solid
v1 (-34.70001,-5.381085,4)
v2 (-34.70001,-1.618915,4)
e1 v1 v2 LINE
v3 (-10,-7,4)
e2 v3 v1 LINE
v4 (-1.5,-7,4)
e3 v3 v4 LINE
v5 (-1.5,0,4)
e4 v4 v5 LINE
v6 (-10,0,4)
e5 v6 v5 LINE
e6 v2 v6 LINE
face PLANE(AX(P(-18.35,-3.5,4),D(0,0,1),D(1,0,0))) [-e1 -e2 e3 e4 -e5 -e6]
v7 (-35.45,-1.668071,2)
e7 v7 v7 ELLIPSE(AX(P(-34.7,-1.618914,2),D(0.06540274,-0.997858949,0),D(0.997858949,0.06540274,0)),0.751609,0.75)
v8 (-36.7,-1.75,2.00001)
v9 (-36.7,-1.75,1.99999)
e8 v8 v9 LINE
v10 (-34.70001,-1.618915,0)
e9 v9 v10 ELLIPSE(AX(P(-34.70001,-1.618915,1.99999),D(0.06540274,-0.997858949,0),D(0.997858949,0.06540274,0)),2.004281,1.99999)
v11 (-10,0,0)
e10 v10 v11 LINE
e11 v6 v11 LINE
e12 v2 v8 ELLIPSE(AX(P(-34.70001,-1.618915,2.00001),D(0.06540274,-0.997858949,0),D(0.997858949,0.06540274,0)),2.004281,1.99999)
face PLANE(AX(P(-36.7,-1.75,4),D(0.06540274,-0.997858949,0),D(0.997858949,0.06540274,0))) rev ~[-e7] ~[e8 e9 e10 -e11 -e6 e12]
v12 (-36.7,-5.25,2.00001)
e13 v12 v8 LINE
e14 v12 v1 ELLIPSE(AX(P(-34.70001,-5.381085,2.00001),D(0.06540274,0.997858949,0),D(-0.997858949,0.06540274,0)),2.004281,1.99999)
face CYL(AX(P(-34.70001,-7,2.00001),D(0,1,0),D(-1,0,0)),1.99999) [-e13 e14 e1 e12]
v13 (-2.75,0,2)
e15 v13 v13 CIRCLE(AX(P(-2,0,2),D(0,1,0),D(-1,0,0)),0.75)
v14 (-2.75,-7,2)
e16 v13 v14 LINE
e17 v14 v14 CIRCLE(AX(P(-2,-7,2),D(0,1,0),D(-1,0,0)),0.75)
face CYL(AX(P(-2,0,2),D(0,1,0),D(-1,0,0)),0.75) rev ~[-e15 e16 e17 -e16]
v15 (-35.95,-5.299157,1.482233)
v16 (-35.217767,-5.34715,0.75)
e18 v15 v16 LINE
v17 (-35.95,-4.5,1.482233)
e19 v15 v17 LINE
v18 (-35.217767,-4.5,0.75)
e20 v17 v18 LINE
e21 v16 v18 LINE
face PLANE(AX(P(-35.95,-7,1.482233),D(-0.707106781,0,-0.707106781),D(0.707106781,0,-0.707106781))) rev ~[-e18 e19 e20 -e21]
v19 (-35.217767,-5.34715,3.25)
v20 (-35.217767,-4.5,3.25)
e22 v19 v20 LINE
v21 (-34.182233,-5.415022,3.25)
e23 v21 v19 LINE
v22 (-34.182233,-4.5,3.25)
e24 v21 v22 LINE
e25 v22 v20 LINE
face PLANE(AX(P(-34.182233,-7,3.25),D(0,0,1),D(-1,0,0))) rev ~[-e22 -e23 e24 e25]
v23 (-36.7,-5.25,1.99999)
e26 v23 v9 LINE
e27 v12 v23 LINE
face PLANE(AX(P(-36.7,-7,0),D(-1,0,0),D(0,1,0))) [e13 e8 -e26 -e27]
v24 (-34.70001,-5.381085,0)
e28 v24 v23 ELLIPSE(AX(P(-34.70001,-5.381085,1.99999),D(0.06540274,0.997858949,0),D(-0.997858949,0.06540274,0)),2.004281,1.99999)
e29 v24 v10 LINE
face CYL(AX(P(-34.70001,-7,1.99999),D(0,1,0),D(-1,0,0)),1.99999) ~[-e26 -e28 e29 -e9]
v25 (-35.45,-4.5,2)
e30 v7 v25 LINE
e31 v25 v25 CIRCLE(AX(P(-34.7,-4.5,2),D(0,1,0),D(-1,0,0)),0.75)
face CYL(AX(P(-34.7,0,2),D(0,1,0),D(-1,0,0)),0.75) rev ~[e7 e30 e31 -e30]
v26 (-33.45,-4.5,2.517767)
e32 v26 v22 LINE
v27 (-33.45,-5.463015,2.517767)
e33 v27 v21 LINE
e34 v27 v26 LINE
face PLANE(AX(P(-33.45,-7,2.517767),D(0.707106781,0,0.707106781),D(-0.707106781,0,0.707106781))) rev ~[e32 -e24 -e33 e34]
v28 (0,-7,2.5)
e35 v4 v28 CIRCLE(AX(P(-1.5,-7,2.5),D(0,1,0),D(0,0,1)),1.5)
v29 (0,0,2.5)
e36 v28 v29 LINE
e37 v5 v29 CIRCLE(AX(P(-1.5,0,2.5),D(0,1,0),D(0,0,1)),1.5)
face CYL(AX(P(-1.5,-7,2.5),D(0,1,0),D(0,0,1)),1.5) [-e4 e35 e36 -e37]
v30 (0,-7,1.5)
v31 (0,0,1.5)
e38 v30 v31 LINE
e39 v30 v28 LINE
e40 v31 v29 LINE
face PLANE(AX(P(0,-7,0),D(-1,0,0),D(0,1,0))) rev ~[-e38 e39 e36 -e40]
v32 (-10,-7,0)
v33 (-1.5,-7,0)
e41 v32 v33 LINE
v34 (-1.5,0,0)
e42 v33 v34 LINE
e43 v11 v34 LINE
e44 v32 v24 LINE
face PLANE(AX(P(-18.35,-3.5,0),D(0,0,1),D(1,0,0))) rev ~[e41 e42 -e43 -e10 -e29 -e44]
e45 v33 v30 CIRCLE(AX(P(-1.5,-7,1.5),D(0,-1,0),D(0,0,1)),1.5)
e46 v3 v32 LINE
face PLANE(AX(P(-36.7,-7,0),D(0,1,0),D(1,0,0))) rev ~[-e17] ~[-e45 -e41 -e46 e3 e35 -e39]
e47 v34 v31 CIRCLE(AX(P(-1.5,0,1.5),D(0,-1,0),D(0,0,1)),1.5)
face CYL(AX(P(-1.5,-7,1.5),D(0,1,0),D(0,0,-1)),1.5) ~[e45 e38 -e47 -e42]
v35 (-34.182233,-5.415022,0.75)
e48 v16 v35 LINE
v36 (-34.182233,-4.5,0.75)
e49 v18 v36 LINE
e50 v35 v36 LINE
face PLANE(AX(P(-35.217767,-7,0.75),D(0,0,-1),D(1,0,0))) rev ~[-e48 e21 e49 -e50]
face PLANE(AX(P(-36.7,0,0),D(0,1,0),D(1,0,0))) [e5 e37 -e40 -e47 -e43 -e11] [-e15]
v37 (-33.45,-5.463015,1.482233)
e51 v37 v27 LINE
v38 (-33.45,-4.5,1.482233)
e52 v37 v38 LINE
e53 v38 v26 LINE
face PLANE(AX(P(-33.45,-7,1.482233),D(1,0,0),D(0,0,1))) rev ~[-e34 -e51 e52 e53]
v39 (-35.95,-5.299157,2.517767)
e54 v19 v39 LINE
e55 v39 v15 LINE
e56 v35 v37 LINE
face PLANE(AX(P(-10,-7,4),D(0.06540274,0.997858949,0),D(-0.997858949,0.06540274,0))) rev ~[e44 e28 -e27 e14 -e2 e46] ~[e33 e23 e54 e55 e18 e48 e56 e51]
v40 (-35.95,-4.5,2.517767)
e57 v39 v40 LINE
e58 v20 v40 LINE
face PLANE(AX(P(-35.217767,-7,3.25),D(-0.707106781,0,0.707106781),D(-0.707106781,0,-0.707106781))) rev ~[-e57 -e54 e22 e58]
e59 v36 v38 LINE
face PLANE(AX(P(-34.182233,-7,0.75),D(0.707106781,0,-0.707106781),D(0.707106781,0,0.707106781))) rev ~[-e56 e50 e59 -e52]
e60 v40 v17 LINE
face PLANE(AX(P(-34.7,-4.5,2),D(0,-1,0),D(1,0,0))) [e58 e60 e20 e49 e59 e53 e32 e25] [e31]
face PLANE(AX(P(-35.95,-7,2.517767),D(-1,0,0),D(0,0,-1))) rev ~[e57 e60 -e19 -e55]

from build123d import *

# Parameters (mm, degrees)
F0_W      = 36.7
F0_H      = 7
F1_DEPTH  = 4
F3_R      = 0.75
F4_DEPTH  = 25
F5_R      = 1.99999
F6_R      = 0.75
F7_DEPTH  = 25
F8_R      = 1.5
F9_R      = 0.75
F10_DEPTH = 2.5
F11_DEPTH = 25


# Not quite as in the source:
# - a fillet or chamfer is up to 0.001 mm smaller than in the source, because OpenCascade refuses the exact size


with BuildPart() as f1:
    # F0 (on Top) → F1 (new body)
    with BuildSketch(Plane.XY):
        with Locations((-18.35, -3.5)):
            Rectangle(F0_W, F0_H)
    extrude(amount=F1_DEPTH)

    # F3 (on face) → F4 (cut)
    with BuildSketch(Plane(origin=(0, 0, 0), x_dir=(-1, 0, 0), z_dir=(0, 1, 0))):
        with Locations((2, 2)):
            Circle(F3_R)
    extrude(amount=-F4_DEPTH, mode=Mode.SUBTRACT)

    # F5 (radius 2 in the source; OpenCascade refuses exactly that, so slightly less here)
    f5_edges = [f1.edges().sort_by_distance(p)[0] for p in [
        (-36.7, -3.5, 0),
        (-36.7, -3.5, 4),
    ]]
    fillet(f5_edges, radius=F5_R)

    # F6 (on face) → F7 (cut)
    with BuildSketch(Plane(origin=(0, 0, 0), x_dir=(-1, 0, 0), z_dir=(0, 1, 0))):
        with Locations((34.7, 2)):
            Circle(F6_R)
    extrude(amount=-F7_DEPTH, mode=Mode.SUBTRACT)

    # F8
    f8_edges = [f1.edges().sort_by_distance(p)[0] for p in [
        (0, -3.5, 4),
        (0, -3.5, 0),
    ]]
    fillet(f8_edges, radius=F8_R)

    # F9 (on face) → F10 (cut)
    with BuildSketch(Plane.XZ.offset(7)):
        Polygon((-33.45, 1.482233047), (-33.45, 2.517766953), (-34.182233047, 3.25), (-35.217766953, 3.25), (-35.95, 2.517766953), (-35.95, 1.482233047), (-35.217766953, 0.75), (-34.182233047, 0.75), align=None)
        with Locations((-34.7, 2)):
            Circle(F9_R, mode=Mode.SUBTRACT)
    extrude(amount=-F10_DEPTH, mode=Mode.SUBTRACT)

    # F2 (on face) → F11 (cut)
    with BuildSketch(Plane.XY.offset(4)):
        Polygon((-36.7, 0), (-36.7, -1.75), (-10, 0), align=None)
        Polygon((-10, -7), (-36.7, -5.25), (-36.7, -7), align=None)
    extrude(amount=-F11_DEPTH, mode=Mode.SUBTRACT)


solid = f1.part
